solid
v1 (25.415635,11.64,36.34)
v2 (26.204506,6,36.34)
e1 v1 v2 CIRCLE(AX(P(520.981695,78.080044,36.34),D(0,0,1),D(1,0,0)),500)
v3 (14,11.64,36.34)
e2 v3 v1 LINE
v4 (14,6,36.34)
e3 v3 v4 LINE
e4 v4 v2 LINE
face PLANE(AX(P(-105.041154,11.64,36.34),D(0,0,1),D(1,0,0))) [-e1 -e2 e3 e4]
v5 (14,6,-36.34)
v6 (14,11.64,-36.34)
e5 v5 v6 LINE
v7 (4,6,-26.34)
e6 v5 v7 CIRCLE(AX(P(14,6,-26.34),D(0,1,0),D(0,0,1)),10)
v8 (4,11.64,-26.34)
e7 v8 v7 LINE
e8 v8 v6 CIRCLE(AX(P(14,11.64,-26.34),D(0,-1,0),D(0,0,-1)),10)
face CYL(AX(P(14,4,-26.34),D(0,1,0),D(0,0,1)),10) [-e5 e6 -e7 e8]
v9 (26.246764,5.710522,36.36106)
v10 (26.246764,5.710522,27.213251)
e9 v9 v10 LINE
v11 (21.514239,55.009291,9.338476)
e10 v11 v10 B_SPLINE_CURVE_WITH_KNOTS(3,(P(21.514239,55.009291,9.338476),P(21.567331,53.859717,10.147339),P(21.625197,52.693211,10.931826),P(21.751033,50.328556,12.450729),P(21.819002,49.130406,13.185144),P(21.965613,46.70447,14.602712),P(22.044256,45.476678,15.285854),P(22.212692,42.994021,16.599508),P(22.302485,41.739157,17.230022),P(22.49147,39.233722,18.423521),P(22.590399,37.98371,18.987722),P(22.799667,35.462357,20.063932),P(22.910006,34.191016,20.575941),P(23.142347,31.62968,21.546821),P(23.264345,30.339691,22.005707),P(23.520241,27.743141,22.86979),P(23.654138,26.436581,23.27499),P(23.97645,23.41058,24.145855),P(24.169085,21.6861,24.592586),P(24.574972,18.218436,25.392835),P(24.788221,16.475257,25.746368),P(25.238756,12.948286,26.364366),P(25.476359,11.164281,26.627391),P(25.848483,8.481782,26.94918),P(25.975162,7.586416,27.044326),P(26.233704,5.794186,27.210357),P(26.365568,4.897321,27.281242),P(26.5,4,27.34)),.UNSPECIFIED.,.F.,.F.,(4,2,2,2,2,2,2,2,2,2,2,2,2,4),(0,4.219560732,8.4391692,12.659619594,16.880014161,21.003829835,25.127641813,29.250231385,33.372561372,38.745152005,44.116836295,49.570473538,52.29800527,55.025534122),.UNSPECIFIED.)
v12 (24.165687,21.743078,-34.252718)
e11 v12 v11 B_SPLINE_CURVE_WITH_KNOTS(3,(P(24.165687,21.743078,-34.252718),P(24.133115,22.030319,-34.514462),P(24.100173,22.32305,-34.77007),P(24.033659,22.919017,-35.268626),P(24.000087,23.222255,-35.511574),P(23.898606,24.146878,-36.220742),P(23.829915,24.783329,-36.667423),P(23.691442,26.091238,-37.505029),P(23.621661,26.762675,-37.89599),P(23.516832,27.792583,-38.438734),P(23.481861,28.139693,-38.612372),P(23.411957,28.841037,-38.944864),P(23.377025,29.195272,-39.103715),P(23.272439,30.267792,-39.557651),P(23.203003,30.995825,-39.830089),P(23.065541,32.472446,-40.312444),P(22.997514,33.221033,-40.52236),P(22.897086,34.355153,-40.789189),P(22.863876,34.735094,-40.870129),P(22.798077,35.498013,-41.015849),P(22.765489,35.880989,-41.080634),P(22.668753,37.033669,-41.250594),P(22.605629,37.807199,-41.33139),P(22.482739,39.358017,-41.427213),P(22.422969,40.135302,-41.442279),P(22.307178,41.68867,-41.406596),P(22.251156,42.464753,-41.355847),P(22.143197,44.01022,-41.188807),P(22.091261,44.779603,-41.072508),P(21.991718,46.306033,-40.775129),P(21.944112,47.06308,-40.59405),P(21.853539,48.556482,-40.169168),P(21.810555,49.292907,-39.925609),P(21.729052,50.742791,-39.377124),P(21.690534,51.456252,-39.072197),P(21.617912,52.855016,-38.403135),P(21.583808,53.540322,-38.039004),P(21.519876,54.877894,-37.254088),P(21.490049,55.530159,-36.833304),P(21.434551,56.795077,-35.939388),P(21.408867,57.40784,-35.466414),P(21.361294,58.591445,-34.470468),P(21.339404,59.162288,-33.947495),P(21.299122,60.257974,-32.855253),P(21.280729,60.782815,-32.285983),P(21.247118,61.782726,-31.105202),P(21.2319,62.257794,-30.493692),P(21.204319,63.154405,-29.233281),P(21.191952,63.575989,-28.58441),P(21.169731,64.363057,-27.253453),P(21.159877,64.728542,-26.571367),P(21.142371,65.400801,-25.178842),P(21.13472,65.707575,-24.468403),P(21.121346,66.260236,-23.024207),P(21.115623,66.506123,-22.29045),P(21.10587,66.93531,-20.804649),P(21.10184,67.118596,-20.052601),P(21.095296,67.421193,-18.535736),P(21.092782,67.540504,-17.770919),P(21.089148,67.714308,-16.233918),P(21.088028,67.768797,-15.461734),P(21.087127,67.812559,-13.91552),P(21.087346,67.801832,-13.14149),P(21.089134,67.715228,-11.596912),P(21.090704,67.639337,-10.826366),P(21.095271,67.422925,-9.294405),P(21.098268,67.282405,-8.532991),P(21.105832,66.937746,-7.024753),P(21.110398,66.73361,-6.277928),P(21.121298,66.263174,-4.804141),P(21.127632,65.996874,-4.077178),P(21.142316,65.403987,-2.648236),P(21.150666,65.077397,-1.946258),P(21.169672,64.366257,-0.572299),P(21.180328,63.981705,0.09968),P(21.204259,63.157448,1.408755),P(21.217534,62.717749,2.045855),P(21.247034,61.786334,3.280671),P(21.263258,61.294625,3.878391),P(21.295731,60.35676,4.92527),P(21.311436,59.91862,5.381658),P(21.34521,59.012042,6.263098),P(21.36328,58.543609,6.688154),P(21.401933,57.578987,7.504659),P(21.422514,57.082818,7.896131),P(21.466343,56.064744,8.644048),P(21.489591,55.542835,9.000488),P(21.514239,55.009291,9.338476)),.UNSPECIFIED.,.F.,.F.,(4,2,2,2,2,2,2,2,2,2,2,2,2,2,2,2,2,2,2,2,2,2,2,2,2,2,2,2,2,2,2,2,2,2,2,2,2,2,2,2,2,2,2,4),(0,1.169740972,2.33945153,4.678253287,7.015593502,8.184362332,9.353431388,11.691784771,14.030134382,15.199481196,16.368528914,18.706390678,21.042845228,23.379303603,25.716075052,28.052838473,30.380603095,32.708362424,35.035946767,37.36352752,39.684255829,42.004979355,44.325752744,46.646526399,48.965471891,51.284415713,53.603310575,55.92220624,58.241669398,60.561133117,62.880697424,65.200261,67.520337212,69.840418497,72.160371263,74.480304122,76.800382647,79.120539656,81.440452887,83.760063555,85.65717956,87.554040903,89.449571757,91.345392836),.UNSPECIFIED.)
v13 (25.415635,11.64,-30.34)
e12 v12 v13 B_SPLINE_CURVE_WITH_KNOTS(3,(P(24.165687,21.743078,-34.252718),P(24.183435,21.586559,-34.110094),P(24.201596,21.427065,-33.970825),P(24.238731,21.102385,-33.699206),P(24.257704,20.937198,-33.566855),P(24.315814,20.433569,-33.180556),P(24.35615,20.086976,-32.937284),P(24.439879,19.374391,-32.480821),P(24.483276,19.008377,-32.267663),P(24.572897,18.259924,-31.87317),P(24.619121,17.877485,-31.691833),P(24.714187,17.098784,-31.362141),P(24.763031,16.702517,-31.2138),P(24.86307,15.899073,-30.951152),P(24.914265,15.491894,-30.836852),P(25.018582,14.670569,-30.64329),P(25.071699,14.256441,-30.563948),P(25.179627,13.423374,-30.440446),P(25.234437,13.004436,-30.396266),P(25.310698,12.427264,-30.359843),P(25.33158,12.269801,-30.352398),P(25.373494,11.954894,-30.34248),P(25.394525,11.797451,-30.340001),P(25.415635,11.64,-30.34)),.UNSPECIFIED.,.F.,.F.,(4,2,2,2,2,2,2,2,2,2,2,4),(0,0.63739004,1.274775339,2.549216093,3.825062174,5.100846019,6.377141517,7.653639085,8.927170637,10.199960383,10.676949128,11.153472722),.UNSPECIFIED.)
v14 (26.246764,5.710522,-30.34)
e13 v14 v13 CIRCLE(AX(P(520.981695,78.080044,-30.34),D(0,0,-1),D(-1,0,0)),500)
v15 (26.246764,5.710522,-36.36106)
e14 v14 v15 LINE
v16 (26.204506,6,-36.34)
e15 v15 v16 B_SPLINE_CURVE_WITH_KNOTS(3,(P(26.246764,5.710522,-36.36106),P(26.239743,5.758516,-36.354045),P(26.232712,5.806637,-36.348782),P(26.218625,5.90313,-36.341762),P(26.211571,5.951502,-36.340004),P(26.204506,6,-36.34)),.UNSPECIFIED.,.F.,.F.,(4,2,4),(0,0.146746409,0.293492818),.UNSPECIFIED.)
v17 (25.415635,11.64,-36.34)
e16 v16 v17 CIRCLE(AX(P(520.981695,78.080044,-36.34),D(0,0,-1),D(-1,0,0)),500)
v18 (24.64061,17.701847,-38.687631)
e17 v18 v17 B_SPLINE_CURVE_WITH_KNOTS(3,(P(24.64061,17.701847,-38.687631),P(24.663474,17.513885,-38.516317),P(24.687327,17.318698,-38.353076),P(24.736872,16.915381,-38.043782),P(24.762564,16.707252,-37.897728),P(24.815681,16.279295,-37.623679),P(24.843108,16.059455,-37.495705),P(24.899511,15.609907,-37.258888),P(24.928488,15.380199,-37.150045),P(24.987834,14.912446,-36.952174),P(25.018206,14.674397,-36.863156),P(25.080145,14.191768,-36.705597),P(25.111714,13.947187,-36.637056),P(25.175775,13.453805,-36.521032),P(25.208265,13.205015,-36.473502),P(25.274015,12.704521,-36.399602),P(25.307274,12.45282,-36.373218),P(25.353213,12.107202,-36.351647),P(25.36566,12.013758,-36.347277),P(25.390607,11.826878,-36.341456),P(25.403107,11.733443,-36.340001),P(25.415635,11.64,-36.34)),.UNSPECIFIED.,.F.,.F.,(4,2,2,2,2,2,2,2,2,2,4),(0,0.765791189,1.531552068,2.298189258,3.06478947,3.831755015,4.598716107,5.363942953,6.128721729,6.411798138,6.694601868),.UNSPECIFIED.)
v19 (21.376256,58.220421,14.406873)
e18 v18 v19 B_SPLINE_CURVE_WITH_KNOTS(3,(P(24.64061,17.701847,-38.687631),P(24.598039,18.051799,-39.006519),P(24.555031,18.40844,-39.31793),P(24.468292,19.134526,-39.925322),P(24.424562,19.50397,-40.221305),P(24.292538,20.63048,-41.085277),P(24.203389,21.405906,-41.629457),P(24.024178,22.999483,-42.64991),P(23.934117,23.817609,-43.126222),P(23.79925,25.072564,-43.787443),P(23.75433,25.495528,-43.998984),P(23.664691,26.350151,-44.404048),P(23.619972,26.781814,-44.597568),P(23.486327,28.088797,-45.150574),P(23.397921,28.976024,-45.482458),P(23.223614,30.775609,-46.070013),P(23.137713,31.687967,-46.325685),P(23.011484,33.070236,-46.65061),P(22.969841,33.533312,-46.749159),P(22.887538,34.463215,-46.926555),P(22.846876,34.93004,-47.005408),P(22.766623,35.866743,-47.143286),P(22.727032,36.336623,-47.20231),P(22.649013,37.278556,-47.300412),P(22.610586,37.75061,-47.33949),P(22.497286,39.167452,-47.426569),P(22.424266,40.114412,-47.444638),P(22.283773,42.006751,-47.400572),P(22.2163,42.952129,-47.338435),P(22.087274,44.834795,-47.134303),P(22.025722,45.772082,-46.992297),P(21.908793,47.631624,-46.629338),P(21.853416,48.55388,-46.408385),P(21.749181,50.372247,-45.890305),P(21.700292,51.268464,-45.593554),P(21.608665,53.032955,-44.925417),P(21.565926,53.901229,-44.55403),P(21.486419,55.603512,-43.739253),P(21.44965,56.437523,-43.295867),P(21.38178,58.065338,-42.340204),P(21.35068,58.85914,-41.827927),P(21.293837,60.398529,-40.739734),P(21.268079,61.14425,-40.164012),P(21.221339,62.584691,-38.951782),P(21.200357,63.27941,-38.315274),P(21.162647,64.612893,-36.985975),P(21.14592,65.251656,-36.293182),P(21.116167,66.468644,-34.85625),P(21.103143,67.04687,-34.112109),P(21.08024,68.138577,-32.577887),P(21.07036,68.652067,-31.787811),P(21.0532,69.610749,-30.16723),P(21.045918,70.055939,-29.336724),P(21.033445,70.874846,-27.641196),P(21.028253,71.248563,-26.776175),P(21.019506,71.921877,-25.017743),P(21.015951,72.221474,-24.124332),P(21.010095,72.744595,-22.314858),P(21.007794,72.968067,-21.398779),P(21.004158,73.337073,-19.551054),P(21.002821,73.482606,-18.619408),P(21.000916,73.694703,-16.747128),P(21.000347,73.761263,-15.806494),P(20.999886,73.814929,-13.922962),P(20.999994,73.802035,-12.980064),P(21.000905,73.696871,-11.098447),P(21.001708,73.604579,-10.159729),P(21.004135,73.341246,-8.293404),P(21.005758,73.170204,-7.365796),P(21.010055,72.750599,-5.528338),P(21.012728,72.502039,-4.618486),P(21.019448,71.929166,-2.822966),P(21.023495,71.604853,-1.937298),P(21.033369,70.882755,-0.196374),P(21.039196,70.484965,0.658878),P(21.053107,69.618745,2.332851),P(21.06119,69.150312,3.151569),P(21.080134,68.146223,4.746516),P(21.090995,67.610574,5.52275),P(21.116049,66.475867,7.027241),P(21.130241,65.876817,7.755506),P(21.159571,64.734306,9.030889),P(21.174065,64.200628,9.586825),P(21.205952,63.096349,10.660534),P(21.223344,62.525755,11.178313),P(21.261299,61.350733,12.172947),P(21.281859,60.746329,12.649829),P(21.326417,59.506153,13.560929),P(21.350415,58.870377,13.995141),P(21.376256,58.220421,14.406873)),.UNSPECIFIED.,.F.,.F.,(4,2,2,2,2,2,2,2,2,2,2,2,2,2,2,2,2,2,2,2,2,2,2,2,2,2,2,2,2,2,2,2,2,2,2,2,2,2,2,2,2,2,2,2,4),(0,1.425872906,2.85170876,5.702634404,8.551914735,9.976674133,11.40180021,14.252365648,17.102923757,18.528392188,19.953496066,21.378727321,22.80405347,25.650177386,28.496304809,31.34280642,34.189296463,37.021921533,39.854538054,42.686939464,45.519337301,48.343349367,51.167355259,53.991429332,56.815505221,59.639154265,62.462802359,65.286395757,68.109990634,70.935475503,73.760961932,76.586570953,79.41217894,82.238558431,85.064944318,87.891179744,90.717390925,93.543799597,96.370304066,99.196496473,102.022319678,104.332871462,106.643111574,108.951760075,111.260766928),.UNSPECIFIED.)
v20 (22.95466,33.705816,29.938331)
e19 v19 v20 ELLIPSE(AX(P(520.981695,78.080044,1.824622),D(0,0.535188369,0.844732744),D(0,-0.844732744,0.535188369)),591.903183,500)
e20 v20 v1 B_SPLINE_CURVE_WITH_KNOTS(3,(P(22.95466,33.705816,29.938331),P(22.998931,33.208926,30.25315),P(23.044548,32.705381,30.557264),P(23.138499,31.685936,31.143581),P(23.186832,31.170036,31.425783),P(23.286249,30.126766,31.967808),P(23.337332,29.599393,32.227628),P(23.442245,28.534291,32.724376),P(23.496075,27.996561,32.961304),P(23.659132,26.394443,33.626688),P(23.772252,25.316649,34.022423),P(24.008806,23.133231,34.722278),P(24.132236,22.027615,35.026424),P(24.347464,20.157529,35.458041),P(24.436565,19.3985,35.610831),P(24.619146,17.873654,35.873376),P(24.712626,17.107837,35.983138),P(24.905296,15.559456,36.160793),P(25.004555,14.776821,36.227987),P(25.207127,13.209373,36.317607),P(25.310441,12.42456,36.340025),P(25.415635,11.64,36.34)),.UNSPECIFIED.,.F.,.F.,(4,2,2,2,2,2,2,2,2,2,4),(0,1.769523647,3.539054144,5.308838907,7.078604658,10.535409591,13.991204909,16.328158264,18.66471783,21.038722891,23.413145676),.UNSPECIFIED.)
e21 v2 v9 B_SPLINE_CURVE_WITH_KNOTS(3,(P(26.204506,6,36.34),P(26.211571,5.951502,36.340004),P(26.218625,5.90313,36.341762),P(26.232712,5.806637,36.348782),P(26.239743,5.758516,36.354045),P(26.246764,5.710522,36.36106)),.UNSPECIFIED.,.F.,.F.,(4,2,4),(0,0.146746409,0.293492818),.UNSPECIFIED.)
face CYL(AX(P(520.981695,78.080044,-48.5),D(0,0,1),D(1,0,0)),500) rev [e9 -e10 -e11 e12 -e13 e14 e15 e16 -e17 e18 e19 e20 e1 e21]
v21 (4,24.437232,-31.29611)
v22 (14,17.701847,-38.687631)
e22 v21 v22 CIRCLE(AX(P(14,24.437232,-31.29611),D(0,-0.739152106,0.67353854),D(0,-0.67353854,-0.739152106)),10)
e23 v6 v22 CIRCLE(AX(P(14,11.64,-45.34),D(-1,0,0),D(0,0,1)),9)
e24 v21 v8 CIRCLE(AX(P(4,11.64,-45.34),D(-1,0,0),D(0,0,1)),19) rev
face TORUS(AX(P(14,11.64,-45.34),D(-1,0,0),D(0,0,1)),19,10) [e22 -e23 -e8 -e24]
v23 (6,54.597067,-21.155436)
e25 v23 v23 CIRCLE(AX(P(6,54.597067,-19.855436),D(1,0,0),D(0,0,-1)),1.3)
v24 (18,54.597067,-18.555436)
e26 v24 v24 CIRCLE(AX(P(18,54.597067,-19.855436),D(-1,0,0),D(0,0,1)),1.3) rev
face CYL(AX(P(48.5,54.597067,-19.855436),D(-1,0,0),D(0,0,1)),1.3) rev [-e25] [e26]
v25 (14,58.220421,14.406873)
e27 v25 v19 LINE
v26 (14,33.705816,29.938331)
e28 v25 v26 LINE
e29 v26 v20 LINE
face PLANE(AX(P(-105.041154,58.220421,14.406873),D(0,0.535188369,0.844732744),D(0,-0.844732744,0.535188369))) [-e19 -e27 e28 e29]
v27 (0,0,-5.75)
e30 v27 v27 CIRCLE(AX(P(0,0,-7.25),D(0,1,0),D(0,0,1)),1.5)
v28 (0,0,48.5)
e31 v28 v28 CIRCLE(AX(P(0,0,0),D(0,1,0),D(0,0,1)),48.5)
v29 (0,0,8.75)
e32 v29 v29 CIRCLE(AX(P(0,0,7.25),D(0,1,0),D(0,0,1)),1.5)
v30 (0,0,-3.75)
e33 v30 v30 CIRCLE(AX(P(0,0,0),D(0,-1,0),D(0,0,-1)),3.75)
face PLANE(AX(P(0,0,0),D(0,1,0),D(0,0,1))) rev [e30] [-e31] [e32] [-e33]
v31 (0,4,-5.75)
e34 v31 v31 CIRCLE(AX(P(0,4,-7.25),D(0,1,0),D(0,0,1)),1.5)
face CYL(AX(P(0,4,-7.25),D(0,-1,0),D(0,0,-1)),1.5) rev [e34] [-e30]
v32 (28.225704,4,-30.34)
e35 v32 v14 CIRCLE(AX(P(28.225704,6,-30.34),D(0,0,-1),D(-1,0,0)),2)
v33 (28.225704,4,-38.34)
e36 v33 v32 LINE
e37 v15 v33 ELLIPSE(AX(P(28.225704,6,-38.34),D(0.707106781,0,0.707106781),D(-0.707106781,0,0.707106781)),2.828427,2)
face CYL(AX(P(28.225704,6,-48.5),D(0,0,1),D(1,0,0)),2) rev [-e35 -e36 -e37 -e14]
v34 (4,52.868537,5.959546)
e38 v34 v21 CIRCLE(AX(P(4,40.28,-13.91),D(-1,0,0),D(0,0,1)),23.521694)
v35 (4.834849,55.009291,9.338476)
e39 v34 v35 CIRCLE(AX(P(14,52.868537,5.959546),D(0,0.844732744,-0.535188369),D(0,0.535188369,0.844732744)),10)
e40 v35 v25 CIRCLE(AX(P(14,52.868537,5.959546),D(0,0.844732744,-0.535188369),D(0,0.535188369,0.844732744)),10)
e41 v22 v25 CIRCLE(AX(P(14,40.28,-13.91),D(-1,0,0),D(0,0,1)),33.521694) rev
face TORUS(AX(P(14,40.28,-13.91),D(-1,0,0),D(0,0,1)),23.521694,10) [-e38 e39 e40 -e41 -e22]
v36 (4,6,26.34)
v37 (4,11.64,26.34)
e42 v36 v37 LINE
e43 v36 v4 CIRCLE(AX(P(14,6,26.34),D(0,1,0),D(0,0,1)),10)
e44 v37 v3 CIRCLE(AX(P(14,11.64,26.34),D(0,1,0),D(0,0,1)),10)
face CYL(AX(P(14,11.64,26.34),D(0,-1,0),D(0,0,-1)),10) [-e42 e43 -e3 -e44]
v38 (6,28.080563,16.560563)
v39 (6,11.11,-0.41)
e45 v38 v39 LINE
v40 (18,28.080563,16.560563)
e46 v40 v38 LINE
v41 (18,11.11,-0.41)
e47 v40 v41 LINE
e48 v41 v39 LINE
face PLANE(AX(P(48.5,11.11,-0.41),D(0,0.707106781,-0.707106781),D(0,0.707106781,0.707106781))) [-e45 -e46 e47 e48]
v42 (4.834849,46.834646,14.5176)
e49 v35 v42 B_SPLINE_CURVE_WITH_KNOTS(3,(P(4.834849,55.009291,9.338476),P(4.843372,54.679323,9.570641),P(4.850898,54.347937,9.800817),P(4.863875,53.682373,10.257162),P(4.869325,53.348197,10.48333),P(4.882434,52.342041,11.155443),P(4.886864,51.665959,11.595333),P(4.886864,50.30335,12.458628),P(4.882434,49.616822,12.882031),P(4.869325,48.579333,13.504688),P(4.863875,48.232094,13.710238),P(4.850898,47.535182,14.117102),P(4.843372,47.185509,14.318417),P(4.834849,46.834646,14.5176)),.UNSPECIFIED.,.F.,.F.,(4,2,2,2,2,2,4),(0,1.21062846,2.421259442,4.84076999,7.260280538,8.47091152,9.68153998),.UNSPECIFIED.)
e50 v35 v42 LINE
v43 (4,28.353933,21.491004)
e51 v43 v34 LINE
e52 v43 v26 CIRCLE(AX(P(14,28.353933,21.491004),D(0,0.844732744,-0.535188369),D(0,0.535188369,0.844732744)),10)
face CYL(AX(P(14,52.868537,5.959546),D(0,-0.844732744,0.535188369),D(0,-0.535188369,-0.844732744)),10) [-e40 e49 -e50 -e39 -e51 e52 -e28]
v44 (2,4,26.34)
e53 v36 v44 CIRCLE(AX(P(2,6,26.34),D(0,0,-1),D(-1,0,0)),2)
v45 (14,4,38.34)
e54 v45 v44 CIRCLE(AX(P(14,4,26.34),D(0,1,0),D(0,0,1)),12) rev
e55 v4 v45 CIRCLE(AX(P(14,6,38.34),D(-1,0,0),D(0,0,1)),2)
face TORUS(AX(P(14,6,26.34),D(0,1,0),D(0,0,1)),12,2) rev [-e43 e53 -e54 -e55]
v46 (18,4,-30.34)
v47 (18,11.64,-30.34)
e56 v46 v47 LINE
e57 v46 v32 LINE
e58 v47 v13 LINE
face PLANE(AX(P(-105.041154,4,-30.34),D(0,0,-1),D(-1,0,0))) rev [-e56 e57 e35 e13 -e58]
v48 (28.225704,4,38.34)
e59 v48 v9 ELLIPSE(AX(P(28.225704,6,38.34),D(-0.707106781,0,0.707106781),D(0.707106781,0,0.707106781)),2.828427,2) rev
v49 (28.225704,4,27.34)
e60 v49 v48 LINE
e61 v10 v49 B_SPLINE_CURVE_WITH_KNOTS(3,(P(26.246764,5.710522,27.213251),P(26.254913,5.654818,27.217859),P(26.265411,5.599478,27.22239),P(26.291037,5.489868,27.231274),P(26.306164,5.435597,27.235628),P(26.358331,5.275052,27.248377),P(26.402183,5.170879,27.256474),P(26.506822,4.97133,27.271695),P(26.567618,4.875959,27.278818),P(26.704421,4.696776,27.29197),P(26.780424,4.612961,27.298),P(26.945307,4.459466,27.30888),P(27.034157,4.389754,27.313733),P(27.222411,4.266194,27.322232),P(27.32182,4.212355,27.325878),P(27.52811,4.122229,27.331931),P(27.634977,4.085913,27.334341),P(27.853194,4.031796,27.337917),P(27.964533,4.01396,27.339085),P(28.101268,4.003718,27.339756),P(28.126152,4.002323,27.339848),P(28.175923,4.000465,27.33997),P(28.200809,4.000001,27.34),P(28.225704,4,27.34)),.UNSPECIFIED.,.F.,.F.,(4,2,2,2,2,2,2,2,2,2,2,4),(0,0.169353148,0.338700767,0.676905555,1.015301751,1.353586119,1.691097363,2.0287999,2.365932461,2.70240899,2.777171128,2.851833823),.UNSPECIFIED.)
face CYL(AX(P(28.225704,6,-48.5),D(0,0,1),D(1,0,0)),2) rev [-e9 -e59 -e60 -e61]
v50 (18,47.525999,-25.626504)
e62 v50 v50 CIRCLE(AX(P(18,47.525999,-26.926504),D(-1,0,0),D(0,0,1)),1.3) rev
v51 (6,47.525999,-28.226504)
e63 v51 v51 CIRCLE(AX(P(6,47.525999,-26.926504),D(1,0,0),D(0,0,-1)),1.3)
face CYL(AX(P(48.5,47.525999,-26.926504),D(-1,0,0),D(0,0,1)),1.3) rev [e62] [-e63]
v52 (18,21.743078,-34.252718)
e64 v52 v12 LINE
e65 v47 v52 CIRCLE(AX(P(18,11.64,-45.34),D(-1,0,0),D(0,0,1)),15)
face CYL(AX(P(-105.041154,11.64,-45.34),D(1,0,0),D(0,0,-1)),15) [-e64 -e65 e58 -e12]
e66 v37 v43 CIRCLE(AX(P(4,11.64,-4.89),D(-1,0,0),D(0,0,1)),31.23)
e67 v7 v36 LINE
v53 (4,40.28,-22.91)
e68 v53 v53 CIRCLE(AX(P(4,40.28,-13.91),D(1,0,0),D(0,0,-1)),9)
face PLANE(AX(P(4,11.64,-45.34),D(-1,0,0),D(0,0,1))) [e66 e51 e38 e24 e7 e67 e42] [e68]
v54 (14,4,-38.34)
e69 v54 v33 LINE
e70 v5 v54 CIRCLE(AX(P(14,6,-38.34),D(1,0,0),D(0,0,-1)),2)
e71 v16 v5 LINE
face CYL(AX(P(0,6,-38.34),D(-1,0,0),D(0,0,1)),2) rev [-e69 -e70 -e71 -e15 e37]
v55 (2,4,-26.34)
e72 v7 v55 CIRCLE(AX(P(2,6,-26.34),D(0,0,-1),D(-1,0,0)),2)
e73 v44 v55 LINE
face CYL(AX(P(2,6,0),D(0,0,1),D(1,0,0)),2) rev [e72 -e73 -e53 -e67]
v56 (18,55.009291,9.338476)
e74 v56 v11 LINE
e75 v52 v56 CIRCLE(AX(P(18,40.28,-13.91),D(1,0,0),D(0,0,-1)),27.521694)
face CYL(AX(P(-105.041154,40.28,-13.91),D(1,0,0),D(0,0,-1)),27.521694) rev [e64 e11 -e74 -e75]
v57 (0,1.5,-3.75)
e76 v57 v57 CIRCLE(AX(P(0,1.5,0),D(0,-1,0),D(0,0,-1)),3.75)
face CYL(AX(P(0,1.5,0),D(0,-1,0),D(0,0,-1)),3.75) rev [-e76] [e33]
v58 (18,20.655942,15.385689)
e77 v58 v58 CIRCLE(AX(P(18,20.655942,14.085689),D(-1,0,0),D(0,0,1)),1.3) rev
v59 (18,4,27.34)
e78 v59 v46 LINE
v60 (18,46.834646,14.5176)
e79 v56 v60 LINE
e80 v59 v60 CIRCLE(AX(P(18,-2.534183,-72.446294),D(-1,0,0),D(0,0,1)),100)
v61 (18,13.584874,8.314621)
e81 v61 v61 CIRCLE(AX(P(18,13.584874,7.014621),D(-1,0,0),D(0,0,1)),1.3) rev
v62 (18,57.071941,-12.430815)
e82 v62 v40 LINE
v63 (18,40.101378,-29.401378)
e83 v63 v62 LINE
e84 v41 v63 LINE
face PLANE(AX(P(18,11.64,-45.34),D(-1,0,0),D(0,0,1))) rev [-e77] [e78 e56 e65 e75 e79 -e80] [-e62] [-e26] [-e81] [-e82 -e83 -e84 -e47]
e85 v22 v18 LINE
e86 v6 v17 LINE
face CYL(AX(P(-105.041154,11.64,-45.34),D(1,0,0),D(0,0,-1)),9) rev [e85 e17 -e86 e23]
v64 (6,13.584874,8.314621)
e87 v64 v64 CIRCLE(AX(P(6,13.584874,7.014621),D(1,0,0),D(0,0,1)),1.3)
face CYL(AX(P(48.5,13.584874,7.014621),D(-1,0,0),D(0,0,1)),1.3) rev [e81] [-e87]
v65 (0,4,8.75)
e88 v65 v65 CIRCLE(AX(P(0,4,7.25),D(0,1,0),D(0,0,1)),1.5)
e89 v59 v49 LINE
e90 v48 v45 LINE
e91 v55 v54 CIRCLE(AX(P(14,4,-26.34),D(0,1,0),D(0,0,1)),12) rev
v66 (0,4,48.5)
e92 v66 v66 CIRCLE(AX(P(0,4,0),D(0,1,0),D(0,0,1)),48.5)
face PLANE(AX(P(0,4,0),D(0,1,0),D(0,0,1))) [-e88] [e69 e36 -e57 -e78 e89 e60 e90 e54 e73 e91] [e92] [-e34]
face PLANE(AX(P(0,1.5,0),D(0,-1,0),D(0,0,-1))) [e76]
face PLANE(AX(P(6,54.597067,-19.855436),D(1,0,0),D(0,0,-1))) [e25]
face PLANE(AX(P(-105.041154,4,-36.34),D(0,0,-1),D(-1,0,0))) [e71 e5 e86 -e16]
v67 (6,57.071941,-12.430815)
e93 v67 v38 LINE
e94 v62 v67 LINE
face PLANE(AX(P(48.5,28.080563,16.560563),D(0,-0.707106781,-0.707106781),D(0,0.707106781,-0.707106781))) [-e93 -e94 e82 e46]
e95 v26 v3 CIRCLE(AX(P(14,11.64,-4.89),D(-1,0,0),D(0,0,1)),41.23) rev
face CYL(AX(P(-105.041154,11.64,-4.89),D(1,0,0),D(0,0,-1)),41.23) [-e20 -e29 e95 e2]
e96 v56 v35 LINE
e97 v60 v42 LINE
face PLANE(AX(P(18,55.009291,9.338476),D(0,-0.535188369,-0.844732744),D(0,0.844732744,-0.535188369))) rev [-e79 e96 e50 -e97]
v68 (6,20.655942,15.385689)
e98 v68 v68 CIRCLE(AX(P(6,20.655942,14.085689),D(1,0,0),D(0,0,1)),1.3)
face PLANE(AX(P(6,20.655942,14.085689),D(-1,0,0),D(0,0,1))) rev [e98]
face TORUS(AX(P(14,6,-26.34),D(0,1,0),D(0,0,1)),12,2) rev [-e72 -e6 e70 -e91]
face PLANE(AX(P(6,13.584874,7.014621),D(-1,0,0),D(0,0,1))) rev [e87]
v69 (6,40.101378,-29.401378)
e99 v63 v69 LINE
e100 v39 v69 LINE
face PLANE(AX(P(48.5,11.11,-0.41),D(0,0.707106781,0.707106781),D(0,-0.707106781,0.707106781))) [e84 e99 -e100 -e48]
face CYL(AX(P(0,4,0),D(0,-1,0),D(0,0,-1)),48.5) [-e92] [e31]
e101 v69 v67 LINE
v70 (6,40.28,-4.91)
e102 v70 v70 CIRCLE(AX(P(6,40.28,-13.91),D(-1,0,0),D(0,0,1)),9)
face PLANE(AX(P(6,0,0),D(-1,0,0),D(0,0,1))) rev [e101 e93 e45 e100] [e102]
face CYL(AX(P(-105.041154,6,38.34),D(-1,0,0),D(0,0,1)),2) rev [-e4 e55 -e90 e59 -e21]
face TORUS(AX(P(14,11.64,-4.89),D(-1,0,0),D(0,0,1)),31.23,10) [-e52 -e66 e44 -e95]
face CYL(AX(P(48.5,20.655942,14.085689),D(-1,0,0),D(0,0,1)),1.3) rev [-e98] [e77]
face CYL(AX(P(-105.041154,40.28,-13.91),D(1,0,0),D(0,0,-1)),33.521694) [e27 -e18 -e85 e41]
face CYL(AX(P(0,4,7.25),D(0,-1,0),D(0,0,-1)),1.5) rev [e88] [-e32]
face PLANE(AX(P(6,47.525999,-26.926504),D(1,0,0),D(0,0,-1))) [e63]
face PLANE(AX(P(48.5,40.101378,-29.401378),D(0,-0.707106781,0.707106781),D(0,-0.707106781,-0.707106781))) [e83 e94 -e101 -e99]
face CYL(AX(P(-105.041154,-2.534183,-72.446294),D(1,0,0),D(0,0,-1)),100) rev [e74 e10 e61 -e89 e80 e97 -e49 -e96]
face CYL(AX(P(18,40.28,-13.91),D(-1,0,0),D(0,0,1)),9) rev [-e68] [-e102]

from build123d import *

# Parameters (mm, degrees)
SKETCH1_R                       = 48.5
SKETCH1_R_2                     = 1.5
BOSS_EXTRUDE1_DEPTH             = 4
SKETCH6_R                       = 3.75
CUT_EXTRUDE15_DEPTH             = 1.5
BOSS_EXTRUDE3_START             = 4
SKETCH5_R                       = 9
BOSS_EXTRUDE3_DEPTH             = 14
CUT_EXTRUDE16_START             = 6
SKETCH9_R                       = 1.3
CUT_EXTRUDE16_DEPTH             = 91.444646155
BOSS_EXTRUDE4_DEPTH             = 9
BOSS_EXTRUDE4_DIRECTION_2_REACH = 108.638
CUT_EXTRUDE17_DEPTH             = 101.75311462
CUT_EXTRUDE17_DEPTH_BACK        = 101.75311462
FILLET2_R                       = 10
FILLET3_R                       = 2


with BuildPart() as part:
    # Sketch1 → Boss-Extrude1 (new body)
    with BuildSketch(Plane(origin=(0, 0, 0), x_dir=(1, 0, 0), z_dir=(0, 1, 0))):
        with Locations(Location((0, 0, 0), (0, 0, 270))):
            Circle(SKETCH1_R)
        with Locations(Location((0, 7.25, 0), (0, 0, 270))):
            Circle(SKETCH1_R_2, mode=Mode.SUBTRACT)
        with Locations(Location((0, -7.25, 0), (0, 0, 270))):
            Circle(SKETCH1_R_2, mode=Mode.SUBTRACT)
    extrude(amount=BOSS_EXTRUDE1_DEPTH)

    # Sketch6 → Cut-Extrude15 (cut)
    with BuildSketch(Plane.XZ):
        with Locations(Location((0, 0, 0), (0, 0, 270))):
            Circle(SKETCH6_R)
    extrude(amount=-CUT_EXTRUDE15_DEPTH, mode=Mode.SUBTRACT)

    # Sketch5 → Boss-Extrude3 (add)
    with BuildSketch(Plane(origin=(0, 0, 0), x_dir=(0, 0, -1), z_dir=(1, 0, 0)).offset(BOSS_EXTRUDE3_START)):
        with BuildLine():
            Line((-30.34, 4), (30.34, 4))
            Line((30.34, 4), (30.34, 11.64))
            ThreePointArc((30.34, 11.64), (31.352340729, 17.057138369), (34.252718415, 21.743078098))
            ThreePointArc((34.252718415, 21.743078098), (30.606439261, 62.158587297), (-9.338476496, 55.009290775))
            Line((-9.338476496, 55.009290775), (-24.869934587, 30.494686245))
            ThreePointArc((-24.869934587, 30.494686245), (-28.94485921, 21.456068574), (-30.34, 11.64))
            Line((-30.34, 11.64), (-30.34, 4))
        make_face()
        with Locations((13.91, 40.28)):
            Circle(SKETCH5_R, mode=Mode.SUBTRACT)
    extrude(amount=BOSS_EXTRUDE3_DEPTH)

    # Sketch9 → Cut-Extrude16 (cut, through all)
    with BuildSketch(Plane(origin=(0, 0, 0), x_dir=(0, 0, -1), z_dir=(1, 0, 0)).offset(CUT_EXTRUDE16_START)):
        with Locations(Location((26.926504294, 47.525999231, 0), (0, 0, 180))):
            Circle(SKETCH9_R)
        with Locations(Location((19.855436483, 54.597067043, 0), (0, 0, 180))):
            Circle(SKETCH9_R)
        with Locations(Location((-7.014621202, 13.584873734, 0), (0, 0, 180))):
            Circle(SKETCH9_R)
        with Locations(Location((-14.085689014, 20.655941546, 0), (0, 0, 180))):
            Circle(SKETCH9_R)
        Polygon((0.41, 11.11), (29.401378029, 40.101378029), (12.43081528, 57.071940777), (-16.560562748, 28.080562748), align=None)
    extrude(amount=CUT_EXTRUDE16_DEPTH, mode=Mode.SUBTRACT)

    # Sketch10 → Boss-Extrude4 (add)
    with BuildSketch(Plane(origin=(18, 0, 0), x_dir=(0, 0, -1), z_dir=(1, 0, 0))):
        with BuildLine():
            Line((36.34, 4), (36.34, 11.64))
            ThreePointArc((36.34, 11.64), (36.947404437, 14.890283021), (38.687631049, 17.701846859))
            ThreePointArc((38.687631049, 17.701846859), (34.246427187, 66.928334449), (-14.406872962, 58.22042099))
            Line((-14.406872962, 58.22042099), (-29.938331054, 33.705816459))
            ThreePointArc((-29.938331054, 33.705816459), (-34.707253625, 23.127837278), (-36.34, 11.64))
            Line((-36.34, 11.64), (-36.34, 4))
            Line((-36.34, 4), (-27.34, 4))
            ThreePointArc((-27.34, 4), (-21.853757974, 30.744943155), (-9.338476496, 55.009290775))
            ThreePointArc((-9.338476496, 55.009290775), (30.606439261, 62.158587297), (34.252718415, 21.743078098))
            ThreePointArc((34.252718415, 21.743078098), (31.352340729, 17.057138369), (30.34, 11.64))
            Line((30.34, 11.64), (30.34, 4))
            Line((30.34, 4), (36.34, 4))
        make_face()
    extrude(amount=BOSS_EXTRUDE4_DEPTH)

    # Boss-Extrude4 direction 2: up to this face of the body (flat: up to its plane)
    boss_extrude4_direction_2_end = Plane(part.part.faces().sort_by_distance((4, 32.000082857, -6.789790598))[0])
    # Sketch10 → Boss-Extrude4 direction 2 (add, up to the picked face)
    with BuildSketch(Plane(origin=(18, 0, 0), x_dir=(0, 0, -1), z_dir=(1, 0, 0)), mode=Mode.PRIVATE) as boss_extrude4_direction_2_sk1:
        with BuildLine():
            Line((36.34, 4), (36.34, 11.64))
            ThreePointArc((36.34, 11.64), (36.947404437, 14.890283021), (38.687631049, 17.701846859))
            ThreePointArc((38.687631049, 17.701846859), (34.246427187, 66.928334449), (-14.406872962, 58.22042099))
            Line((-14.406872962, 58.22042099), (-29.938331054, 33.705816459))
            ThreePointArc((-29.938331054, 33.705816459), (-34.707253625, 23.127837278), (-36.34, 11.64))
            Line((-36.34, 11.64), (-36.34, 4))
            Line((-36.34, 4), (-27.34, 4))
            ThreePointArc((-27.34, 4), (-21.853757974, 30.744943155), (-9.338476496, 55.009290775))
            ThreePointArc((-9.338476496, 55.009290775), (30.606439261, 62.158587297), (34.252718415, 21.743078098))
            ThreePointArc((34.252718415, 21.743078098), (31.352340729, 17.057138369), (30.34, 11.64))
            Line((30.34, 11.64), (30.34, 4))
            Line((30.34, 4), (36.34, 4))
        make_face()
    boss_extrude4_direction_2_tool1 = split(extrude(boss_extrude4_direction_2_sk1.sketch, amount=-BOSS_EXTRUDE4_DIRECTION_2_REACH, mode=Mode.PRIVATE), bisect_by=boss_extrude4_direction_2_end, keep=Keep.BOTH, mode=Mode.PRIVATE)
    add(boss_extrude4_direction_2_tool1.solids().sort_by(Axis((18, 63.025419, -31.267953), (-1, 0, 0)))[0])

    # Sketch11 → Cut-Extrude17 (cut, two sides: drawn at the far end of the back side and taken through both)
    with BuildSketch(Plane.XY.offset(-CUT_EXTRUDE17_DEPTH_BACK)):
        with BuildLine():
            Line((27, 73.801694463), (21, 73.801694463))
            ThreePointArc((21, 73.801694463), (22.52665425, 38.804454133), (26.5, 4))
            Line((26.5, 4), (27, 4))
            Line((27, 4), (27, 73.801694463))
        make_face()
    extrude(amount=CUT_EXTRUDE17_DEPTH + CUT_EXTRUDE17_DEPTH_BACK, mode=Mode.SUBTRACT)

    # Fillet2
    # the kernel refuses this fillet: 10 mm, written as the material it takes off along each edge
    with BuildSketch(Plane(origin=(4, 40.28, -13.91), x_dir=(0, -0.6735385398377843, -0.7391521056948872), z_dir=(0, -0.7391521056948872, 0.6735385398377843))) as fillet2_piece_1:
        with BuildLine():
            CenterArc((33.521694463 - FILLET2_R, FILLET2_R), FILLET2_R, 270, 90)
            Line((33.521694463, FILLET2_R), (33.521694463, 0))
            Line((33.521694463, 0), (33.521694463 - FILLET2_R, 0))
        make_face()
    revolve(axis=Axis((4, 40.28, -13.91), (1, 0, 0)), revolution_arc=189.984074965, mode=Mode.SUBTRACT)
    with BuildSketch(Plane(origin=(4, 58.22042099, 14.406872962), x_dir=(0, -0.5351883691335427, -0.8447327444489049), z_dir=(0, -0.8447327444489049, 0.5351883691335426))) as fillet2_piece_2:
        with BuildLine():
            CenterArc((FILLET2_R, FILLET2_R), FILLET2_R, 180, 90)
            Line((0, FILLET2_R), (0, 0))
            Line((0, 0), (FILLET2_R, 0))
        make_face()
    extrude(amount=29.020544891, mode=Mode.SUBTRACT)
    with BuildSketch(Plane(origin=(4, 11.64, -4.89), x_dir=(0, 0.5351883691335412, 0.8447327444489058), z_dir=(0, 0.8447327444489058, -0.5351883691335412))) as fillet2_piece_3:
        with BuildLine():
            CenterArc((41.23 - FILLET2_R, FILLET2_R), FILLET2_R, 270, 90)
            Line((41.23, FILLET2_R), (41.23, 0))
            Line((41.23, 0), (41.23 - FILLET2_R, 0))
        make_face()
    revolve(axis=Axis((4, 11.64, -4.89), (1, 0, 0)), revolution_arc=32.356687045, mode=Mode.SUBTRACT)
    with BuildSketch(Plane(origin=(4, 11.64, 36.34), x_dir=(0, 0, -1), z_dir=(0, -1, 0)), Plane(origin=(4, 4, -36.34), x_dir=(0, 0, 1), z_dir=(0, 1, 0))) as fillet2_piece_4:
        with BuildLine():
            CenterArc((FILLET2_R, FILLET2_R), FILLET2_R, 180, 90)
            Line((0, FILLET2_R), (0, 0))
            Line((0, 0), (FILLET2_R, 0))
        make_face()
    extrude(amount=7.64, mode=Mode.SUBTRACT)
    with BuildSketch(Plane(origin=(4, 11.64, -45.34), x_dir=(0, 0.6735385398377856, 0.739152105694886), z_dir=(0, 0.739152105694886, -0.6735385398377856))) as fillet2_piece_5:
        with BuildLine():
            CenterArc((9 + FILLET2_R, FILLET2_R), FILLET2_R, 180, 90)
            Line((9, FILLET2_R), (9, 0))
            Line((9, 0), (9 + FILLET2_R, 0))
        make_face()
    revolve(axis=Axis((4, 11.64, -45.34), (1, 0, 0)), revolution_arc=42.340762009, mode=Mode.SUBTRACT)

    # Fillet3
    fillet3_edges = [part.edges().sort_by_distance(p)[0] for p in [
        (20.25, 4, -36.34),
        (20.25, 4, 36.34),
        (6.928932188, 4, 33.411067812),
        (4, 4, 0),
        (6.928932188, 4, -33.411067812),
    ]]
    fillet(fillet3_edges, radius=FILLET3_R)
    fillet3_2_edges = [part.edges().sort_by_distance(p)[0] for p in [
        (26.5, 4, -33.34),
    ]]
    fillet(fillet3_2_edges, radius=FILLET3_R)
    fillet3_3_edges = [part.edges().sort_by_distance(p)[0] for p in [
        (26.5, 4, 31.84),
    ]]
    fillet(fillet3_3_edges, radius=FILLET3_R)


solid = part.part
